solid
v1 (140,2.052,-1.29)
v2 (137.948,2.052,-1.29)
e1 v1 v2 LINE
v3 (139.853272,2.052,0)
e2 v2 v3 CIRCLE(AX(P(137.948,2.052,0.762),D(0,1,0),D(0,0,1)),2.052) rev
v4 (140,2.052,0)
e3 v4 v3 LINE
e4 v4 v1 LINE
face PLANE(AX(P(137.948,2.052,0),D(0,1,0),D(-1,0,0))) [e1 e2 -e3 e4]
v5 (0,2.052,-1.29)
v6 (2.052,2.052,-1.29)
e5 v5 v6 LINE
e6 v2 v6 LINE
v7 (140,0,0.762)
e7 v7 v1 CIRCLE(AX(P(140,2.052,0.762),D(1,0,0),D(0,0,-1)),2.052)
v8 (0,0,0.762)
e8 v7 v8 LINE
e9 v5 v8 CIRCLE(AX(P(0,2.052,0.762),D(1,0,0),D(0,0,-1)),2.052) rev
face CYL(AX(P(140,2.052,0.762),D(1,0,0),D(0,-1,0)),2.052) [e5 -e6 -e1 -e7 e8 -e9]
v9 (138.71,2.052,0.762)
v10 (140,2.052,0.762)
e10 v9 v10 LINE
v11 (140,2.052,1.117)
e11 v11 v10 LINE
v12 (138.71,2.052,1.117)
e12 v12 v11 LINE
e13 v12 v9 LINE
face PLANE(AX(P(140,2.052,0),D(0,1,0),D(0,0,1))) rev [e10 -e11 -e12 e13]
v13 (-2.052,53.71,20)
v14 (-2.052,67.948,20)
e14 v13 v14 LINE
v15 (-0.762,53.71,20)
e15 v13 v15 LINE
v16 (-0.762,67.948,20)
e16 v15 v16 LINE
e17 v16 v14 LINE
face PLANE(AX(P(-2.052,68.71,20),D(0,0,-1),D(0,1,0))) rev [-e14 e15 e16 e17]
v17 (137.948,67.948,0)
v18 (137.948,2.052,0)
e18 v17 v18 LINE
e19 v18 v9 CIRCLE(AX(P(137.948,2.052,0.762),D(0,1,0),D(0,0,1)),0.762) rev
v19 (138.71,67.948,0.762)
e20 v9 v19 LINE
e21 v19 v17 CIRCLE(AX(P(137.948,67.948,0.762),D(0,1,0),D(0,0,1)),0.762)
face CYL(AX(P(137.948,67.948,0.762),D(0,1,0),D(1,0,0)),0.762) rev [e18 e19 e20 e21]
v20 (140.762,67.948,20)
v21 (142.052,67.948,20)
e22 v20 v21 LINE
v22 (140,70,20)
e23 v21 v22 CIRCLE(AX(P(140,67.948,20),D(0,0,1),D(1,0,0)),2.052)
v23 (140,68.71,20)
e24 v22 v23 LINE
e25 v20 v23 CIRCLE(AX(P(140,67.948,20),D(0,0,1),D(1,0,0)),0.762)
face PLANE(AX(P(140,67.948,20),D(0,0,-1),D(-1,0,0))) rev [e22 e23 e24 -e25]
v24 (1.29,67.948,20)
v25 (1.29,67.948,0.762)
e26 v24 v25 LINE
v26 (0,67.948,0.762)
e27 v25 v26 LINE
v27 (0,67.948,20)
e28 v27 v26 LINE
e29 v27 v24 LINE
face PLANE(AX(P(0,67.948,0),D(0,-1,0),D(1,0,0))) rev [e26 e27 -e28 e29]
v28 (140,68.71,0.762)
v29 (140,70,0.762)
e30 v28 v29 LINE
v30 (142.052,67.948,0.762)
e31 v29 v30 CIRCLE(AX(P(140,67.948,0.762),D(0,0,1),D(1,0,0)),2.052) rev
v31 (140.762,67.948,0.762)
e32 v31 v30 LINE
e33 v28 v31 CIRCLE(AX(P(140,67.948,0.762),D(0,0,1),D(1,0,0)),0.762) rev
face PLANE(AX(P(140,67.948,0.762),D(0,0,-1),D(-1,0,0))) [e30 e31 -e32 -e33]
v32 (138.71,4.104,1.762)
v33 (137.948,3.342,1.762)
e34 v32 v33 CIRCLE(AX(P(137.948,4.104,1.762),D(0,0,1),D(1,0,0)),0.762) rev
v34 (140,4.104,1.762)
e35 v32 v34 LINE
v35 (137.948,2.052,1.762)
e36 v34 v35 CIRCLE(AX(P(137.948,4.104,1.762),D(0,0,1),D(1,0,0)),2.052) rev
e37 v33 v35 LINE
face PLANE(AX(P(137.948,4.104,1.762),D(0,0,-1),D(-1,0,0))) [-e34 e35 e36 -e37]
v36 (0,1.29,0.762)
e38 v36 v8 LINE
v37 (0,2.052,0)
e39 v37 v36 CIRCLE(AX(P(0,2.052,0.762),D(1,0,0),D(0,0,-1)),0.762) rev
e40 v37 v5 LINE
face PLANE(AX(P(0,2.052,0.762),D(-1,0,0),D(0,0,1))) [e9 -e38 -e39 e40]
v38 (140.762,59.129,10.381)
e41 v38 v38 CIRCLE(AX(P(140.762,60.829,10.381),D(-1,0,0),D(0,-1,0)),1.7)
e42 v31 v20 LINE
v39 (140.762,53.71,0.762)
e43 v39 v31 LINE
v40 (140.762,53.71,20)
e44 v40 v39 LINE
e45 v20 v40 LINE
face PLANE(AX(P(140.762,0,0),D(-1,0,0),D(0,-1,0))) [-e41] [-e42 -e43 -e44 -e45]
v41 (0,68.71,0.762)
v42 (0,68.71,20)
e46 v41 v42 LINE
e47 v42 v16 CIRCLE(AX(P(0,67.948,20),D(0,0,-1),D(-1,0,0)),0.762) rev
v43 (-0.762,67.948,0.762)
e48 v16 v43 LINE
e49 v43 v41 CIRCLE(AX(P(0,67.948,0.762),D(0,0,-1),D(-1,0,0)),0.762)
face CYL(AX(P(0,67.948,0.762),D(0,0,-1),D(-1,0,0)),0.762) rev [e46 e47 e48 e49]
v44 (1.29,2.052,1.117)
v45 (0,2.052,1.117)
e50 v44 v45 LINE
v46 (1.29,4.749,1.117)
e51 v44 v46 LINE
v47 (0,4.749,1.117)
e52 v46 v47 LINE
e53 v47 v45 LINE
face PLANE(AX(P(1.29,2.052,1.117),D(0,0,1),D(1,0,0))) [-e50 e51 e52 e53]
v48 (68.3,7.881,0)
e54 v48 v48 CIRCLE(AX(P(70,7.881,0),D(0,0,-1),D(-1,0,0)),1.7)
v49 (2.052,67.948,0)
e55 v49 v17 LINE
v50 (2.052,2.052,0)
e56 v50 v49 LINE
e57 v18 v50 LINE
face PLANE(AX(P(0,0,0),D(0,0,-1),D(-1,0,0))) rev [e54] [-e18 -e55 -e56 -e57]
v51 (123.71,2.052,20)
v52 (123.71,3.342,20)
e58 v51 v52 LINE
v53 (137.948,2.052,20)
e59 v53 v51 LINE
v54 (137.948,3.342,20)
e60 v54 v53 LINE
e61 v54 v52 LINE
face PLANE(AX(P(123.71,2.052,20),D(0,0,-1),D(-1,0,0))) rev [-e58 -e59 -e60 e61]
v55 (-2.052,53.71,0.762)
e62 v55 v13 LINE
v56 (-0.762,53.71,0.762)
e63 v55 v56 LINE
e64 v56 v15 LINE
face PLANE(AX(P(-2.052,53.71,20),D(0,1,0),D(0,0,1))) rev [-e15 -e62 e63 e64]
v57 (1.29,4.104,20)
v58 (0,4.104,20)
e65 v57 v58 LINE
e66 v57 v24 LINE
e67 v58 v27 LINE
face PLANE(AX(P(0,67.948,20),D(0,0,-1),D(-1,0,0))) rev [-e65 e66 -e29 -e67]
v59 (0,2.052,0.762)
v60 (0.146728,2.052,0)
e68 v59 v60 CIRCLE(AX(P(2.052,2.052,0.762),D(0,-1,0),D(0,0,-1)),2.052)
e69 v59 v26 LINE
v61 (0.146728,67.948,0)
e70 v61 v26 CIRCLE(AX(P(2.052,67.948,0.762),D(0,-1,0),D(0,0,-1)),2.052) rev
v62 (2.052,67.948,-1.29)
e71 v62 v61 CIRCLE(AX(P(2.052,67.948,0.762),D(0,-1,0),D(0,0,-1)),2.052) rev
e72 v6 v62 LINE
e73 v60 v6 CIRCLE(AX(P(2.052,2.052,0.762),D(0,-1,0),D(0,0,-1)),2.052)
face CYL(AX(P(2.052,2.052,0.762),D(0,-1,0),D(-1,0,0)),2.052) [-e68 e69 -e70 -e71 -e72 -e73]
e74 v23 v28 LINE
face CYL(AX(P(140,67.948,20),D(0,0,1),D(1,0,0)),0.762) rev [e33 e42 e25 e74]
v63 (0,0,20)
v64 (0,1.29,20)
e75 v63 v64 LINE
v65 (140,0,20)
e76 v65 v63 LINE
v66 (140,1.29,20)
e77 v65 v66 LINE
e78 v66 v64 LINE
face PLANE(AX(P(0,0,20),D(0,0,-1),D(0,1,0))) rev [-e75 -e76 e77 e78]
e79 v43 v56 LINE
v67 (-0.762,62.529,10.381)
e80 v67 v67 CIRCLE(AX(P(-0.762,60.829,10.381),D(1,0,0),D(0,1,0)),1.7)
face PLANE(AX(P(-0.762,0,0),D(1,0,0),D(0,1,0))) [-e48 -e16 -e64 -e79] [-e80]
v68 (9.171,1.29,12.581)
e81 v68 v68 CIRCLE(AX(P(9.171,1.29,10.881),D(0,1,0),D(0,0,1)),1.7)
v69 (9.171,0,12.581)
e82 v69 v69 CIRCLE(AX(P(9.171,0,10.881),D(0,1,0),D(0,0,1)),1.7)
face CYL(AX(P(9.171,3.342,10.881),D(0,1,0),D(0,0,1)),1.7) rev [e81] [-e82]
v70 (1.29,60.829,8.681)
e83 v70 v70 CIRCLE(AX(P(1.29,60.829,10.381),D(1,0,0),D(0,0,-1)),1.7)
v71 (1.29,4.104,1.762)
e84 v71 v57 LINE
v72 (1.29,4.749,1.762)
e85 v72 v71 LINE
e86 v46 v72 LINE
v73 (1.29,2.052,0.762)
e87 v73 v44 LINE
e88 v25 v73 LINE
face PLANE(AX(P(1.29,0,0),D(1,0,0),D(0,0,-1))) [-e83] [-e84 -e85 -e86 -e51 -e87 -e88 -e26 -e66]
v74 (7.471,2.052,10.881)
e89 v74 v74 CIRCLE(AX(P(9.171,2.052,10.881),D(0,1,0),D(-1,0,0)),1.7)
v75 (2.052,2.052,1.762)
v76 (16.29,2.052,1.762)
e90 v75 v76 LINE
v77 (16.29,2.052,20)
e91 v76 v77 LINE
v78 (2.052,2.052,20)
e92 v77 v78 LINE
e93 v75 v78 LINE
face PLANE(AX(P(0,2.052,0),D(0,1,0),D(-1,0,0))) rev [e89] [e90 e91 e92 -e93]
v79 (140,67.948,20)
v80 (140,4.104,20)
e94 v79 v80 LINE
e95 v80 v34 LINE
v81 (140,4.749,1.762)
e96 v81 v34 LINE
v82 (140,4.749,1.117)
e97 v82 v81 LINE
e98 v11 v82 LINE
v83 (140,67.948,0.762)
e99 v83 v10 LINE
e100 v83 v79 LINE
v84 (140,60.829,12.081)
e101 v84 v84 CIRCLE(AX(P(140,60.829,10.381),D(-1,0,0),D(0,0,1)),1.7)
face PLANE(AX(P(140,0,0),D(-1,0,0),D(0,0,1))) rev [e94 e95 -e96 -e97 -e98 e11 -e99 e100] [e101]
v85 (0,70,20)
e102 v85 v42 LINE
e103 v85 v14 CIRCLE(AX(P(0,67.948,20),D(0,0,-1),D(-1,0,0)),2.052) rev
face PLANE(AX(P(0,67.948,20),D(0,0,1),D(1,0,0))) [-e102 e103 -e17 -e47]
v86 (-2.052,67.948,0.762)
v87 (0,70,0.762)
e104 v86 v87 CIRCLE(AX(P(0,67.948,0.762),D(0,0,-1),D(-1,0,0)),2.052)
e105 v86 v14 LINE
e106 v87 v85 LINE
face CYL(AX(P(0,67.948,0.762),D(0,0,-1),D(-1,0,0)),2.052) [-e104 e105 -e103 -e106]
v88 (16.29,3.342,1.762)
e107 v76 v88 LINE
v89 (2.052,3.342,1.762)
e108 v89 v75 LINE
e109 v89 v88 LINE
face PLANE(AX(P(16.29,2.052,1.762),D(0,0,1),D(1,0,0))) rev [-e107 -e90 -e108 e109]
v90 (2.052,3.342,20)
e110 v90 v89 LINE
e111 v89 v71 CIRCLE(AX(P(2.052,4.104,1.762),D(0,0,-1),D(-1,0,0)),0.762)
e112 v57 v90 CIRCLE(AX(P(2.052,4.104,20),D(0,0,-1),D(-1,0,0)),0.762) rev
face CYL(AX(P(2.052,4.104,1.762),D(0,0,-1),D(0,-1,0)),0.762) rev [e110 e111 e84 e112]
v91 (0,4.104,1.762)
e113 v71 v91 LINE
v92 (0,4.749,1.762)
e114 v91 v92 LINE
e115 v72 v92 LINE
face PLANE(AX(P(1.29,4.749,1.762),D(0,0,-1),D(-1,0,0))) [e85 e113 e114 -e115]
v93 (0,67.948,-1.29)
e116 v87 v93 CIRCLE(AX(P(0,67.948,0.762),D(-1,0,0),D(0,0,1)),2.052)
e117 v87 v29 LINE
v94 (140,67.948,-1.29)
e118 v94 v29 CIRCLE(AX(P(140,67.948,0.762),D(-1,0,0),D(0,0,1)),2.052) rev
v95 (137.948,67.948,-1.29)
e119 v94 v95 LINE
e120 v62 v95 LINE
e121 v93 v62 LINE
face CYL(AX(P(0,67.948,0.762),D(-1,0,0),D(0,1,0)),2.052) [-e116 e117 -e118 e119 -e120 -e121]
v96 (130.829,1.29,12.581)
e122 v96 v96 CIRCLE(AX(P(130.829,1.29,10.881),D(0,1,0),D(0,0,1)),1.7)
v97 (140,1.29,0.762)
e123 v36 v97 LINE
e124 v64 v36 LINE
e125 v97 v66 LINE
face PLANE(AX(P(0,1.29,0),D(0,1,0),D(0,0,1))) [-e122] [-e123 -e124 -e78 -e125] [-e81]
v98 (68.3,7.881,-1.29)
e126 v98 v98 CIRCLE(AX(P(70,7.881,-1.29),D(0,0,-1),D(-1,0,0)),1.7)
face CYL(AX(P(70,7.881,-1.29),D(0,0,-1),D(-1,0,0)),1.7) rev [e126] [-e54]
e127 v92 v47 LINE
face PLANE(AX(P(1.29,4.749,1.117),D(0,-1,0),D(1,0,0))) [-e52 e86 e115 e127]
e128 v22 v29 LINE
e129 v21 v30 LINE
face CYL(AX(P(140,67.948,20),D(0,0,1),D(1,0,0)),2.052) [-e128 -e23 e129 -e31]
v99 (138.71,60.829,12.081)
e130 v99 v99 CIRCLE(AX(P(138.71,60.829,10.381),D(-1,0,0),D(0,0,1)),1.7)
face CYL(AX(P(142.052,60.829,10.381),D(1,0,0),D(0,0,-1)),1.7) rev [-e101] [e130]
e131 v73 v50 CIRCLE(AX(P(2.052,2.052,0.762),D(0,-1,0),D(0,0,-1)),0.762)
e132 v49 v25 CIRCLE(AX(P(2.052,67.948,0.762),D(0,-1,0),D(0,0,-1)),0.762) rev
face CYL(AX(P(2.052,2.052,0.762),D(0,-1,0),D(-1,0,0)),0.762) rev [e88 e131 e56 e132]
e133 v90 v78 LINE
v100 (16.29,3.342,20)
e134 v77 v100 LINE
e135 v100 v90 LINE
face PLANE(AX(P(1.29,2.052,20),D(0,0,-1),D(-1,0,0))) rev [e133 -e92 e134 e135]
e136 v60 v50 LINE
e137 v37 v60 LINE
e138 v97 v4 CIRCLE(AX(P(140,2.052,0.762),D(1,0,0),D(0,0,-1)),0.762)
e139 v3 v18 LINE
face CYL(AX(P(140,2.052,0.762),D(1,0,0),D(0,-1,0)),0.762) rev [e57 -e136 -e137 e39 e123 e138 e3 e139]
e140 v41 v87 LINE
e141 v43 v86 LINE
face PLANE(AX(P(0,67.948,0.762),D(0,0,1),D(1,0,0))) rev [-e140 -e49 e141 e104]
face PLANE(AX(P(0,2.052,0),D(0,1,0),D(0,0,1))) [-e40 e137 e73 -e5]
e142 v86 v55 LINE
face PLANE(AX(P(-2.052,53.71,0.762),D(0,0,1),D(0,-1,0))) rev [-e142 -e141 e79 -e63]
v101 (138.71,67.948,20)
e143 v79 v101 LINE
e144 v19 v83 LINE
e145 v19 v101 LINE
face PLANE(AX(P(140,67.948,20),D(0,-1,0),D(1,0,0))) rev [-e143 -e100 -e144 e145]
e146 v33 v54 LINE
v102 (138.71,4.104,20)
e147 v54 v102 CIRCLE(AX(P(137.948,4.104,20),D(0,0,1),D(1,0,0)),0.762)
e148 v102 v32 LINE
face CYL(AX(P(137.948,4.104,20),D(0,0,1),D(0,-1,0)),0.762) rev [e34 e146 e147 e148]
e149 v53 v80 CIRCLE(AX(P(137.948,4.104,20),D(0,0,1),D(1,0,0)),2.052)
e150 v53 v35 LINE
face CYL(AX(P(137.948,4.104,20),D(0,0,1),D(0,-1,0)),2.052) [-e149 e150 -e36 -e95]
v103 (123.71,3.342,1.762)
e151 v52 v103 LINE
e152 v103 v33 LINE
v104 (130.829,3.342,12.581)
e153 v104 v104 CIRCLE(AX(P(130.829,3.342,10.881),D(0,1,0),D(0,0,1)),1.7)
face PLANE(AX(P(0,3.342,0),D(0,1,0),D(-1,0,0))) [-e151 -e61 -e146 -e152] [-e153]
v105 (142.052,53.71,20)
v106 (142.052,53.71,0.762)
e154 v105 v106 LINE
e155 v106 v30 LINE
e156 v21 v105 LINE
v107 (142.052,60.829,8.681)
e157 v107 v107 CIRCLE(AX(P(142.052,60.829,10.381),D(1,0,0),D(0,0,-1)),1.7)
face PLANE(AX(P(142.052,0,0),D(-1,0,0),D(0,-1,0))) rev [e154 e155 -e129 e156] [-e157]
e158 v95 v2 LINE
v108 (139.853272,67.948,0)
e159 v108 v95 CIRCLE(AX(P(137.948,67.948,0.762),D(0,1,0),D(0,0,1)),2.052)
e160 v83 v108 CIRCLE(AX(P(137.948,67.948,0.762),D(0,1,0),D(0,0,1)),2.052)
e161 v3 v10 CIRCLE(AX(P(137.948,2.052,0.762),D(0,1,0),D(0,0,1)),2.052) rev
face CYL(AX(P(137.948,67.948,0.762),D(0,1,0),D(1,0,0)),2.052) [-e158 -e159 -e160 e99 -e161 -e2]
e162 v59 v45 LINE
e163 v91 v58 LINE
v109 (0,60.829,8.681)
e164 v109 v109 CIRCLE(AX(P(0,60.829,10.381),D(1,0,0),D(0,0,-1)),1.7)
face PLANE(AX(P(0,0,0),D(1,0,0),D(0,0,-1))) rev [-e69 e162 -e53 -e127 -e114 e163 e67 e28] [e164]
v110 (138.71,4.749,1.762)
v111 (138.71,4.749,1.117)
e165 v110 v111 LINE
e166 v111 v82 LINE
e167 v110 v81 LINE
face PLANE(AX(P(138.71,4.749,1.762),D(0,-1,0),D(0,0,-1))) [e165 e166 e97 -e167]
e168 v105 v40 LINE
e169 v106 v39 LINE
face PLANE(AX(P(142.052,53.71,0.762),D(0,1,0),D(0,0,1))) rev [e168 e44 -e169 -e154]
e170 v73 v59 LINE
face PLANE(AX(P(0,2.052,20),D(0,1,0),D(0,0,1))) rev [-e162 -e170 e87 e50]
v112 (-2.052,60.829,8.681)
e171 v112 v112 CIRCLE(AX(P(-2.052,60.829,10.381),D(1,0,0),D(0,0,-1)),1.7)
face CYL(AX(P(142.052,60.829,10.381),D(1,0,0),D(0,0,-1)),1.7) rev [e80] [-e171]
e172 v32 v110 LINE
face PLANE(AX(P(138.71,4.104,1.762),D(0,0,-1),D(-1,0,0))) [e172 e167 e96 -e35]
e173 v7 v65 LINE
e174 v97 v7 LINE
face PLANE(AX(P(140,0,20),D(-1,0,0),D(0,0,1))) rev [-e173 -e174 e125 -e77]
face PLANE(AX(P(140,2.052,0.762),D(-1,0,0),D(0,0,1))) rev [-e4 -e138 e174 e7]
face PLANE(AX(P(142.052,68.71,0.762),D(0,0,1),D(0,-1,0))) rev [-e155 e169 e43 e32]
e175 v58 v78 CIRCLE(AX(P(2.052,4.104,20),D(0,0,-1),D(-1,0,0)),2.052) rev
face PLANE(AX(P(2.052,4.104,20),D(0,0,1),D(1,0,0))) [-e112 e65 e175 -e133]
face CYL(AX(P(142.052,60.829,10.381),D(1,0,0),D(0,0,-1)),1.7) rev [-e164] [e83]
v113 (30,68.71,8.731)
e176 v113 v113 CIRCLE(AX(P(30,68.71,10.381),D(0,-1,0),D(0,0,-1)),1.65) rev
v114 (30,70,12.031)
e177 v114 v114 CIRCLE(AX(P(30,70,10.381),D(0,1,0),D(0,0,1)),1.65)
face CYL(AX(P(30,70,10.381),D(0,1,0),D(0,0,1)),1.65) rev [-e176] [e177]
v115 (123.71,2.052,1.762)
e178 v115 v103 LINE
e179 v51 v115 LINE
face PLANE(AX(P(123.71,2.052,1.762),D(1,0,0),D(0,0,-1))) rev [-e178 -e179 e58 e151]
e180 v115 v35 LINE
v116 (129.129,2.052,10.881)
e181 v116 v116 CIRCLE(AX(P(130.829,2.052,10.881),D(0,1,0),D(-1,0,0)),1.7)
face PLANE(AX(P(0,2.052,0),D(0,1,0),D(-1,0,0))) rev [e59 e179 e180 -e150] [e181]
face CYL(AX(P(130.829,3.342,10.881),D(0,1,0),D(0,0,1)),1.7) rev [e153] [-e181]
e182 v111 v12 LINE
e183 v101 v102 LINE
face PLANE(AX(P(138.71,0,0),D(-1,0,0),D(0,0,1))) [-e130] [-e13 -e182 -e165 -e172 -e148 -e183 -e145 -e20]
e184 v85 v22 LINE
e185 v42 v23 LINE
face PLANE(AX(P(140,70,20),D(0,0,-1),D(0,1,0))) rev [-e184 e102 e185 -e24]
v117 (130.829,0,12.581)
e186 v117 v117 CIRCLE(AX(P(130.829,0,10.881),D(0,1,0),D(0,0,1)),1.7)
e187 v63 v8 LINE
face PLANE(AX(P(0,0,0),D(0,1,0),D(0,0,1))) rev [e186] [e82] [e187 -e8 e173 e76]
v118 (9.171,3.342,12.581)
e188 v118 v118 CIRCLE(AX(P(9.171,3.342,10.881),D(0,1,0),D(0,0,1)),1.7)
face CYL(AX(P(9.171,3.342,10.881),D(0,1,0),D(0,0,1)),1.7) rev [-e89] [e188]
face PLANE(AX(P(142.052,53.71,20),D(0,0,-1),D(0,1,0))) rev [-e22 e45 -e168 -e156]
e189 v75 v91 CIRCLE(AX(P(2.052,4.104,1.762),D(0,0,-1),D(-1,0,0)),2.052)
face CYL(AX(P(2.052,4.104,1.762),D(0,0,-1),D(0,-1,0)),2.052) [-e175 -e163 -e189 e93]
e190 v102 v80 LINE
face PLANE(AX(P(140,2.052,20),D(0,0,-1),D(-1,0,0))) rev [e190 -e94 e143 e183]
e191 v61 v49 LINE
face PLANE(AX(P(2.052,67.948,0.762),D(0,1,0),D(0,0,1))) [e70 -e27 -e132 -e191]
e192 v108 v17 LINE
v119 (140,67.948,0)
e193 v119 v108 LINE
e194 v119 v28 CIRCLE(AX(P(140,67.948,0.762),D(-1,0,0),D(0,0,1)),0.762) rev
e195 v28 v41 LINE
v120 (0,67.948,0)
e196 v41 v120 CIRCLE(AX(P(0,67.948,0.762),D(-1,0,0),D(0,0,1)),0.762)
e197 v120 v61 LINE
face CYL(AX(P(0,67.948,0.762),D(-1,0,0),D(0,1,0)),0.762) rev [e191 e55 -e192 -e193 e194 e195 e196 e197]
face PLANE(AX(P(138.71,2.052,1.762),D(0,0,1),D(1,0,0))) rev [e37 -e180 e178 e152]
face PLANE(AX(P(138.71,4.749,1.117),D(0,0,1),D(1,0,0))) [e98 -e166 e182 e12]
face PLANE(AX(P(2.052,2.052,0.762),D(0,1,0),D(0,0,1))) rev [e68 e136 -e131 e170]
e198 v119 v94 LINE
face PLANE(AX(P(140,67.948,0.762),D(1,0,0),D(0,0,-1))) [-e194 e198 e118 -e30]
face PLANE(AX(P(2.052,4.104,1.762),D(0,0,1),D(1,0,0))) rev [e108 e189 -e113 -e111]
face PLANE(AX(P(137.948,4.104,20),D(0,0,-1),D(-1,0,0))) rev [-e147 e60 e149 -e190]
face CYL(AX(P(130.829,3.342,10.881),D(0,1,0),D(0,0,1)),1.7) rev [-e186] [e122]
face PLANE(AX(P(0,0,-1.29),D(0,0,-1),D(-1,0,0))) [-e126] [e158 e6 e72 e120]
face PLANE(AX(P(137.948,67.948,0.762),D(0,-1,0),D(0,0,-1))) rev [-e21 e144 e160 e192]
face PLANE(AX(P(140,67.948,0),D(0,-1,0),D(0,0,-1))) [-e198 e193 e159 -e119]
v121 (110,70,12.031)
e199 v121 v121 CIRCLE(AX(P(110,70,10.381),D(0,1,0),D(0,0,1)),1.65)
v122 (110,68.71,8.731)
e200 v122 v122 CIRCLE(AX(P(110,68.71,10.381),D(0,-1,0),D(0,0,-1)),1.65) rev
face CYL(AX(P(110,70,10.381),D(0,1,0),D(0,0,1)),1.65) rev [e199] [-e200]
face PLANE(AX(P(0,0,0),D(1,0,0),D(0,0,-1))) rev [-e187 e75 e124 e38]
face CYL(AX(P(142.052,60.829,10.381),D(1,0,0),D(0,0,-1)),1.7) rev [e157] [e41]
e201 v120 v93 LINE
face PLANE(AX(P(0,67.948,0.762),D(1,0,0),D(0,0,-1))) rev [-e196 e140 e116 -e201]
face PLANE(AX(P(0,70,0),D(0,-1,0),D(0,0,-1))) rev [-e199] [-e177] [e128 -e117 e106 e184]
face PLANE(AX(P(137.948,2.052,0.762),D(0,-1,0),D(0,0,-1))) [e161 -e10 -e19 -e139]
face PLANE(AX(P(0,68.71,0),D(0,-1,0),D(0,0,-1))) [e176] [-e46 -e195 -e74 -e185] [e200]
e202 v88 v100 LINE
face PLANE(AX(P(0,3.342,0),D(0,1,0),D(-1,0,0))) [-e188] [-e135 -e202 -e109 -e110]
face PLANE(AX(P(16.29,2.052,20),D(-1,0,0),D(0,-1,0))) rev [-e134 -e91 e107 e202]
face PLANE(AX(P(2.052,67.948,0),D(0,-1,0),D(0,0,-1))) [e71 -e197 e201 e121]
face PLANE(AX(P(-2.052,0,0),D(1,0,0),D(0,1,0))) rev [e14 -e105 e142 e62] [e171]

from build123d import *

# Parameters (mm, degrees)
SKETCH1_W                        = 140
SKETCH1_H                        = 70
BASE_FLANGE1_DEPTH               = 1.29
EDGE_FLANGE1_STRIP_W             = 6.684
EDGE_FLANGE1_STRIP_H             = 1.29
EDGE_FLANGE1_STRIP_CUT_DEPTH     = 140
EDGE_FLANGE1_DEPTH               = 140
EDGE_FLANGE2_STRIP_W             = 6.684
EDGE_FLANGE2_STRIP_H             = 1.29
EDGE_FLANGE2_STRIP_CUT_DEPTH     = 140
EDGE_FLANGE2_DEPTH               = 140
EDGE_FLANGE3_STRIP_W             = 6.684
EDGE_FLANGE3_STRIP_H             = 1.29
EDGE_FLANGE3_STRIP_CUT_DEPTH     = 65.896
EDGE_FLANGE3_DEPTH               = 65.896
EDGE_FLANGE4_STRIP_W             = 6.684
EDGE_FLANGE4_STRIP_H             = 1.29
EDGE_FLANGE4_STRIP_CUT_DEPTH     = 65.896
EDGE_FLANGE4_DEPTH               = 65.896
EDGE_FLANGE6_START               = 1.117
EDGE_FLANGE6_DEPTH               = 18.883
EDGE_FLANGE6_2_DEPTH             = 0.645
EDGE_FLANGE6_START_2             = 1.762
EDGE_FLANGE6_3_DEPTH             = 18.238
EDGE_FLANGE8_START               = 1.117
EDGE_FLANGE8_DEPTH               = 18.883
EDGE_FLANGE8_2_DEPTH             = 0.645
EDGE_FLANGE8_START_2             = 1.762
EDGE_FLANGE8_3_DEPTH             = 18.238
M3_CLEARANCE_HOLE1_D             = 3.4
EDGE_FLANGE9_DEPTH               = 19.238
EDGE_FLANGE10_DEPTH              = 19.238
TAP_DRILL_FOR_M4X0_7_TAP1_REACH  = 161.621
TAP_DRILL_FOR_M4X0_7_TAP1_BORE_R = 1.65
M3_CLEARANCE_HOLE3_D             = 3.4
M3_CLEARANCE_HOLE3_DEPTH         = 3.342
M3_CLEARANCE_HOLE4_D             = 3.4


# Read off the part's stored shape, not the designer's step: Edge-Flange6, Edge-Flange8
# Sheet-metal steps are written as plain solids
with BuildPart() as part:
    # Sketch1 → Base-Flange1 (new body)
    with BuildSketch(Plane.XY):
        with Locations((70, 35)):
            Rectangle(SKETCH1_W, SKETCH1_H)
    extrude(amount=-BASE_FLANGE1_DEPTH)

    # Edge-Flange1 strip (across the edge) → Edge-Flange1 strip cut (cut)
    with BuildSketch(Plane(origin=(140, 70, 0), x_dir=(0, -1, 0), z_dir=(-1, 0, 0))):
        with Locations((-1.29, -0.645)):
            Rectangle(EDGE_FLANGE1_STRIP_W, EDGE_FLANGE1_STRIP_H)
    extrude(amount=EDGE_FLANGE1_STRIP_CUT_DEPTH, mode=Mode.SUBTRACT)

    # Edge-Flange1 section (across the edge) → Edge-Flange1 (add)
    with BuildSketch(Plane(origin=(140, 70, 0), x_dir=(0, -1, 0), z_dir=(-1, 0, 0))):
        with BuildLine():
            Line((0, 0.762), (0, 20))
            Line((0, 20), (1.29, 20))
            Line((1.29, 20), (1.29, 0.762))
            ThreePointArc((1.29, 0.762), (1.513184633, 0.223184633), (2.052, 0))
            Line((2.052, 0), (2.052, -1.29))
            ThreePointArc((2.052, -1.29), (0.601016885, -0.688983115), (0, 0.762))
        make_face()
    extrude(amount=EDGE_FLANGE1_DEPTH)

    # Edge-Flange2 strip (across the edge) → Edge-Flange2 strip cut (cut)
    with BuildSketch(Plane.YZ):
        with Locations((-1.29, -0.645)):
            Rectangle(EDGE_FLANGE2_STRIP_W, EDGE_FLANGE2_STRIP_H)
    extrude(amount=EDGE_FLANGE2_STRIP_CUT_DEPTH, mode=Mode.SUBTRACT)

    # Edge-Flange2 section (across the edge) → Edge-Flange2 (add)
    with BuildSketch(Plane.YZ):
        with BuildLine():
            Line((0, 0.762), (0, 20))
            Line((0, 20), (1.29, 20))
            Line((1.29, 20), (1.29, 0.762))
            ThreePointArc((1.29, 0.762), (1.513184633, 0.223184633), (2.052, 0))
            Line((2.052, 0), (2.052, -1.29))
            ThreePointArc((2.052, -1.29), (0.601016885, -0.688983115), (0, 0.762))
        make_face()
    extrude(amount=EDGE_FLANGE2_DEPTH)

    # Edge-Flange3 strip (across the edge) → Edge-Flange3 strip cut (cut)
    with BuildSketch(Plane.XZ.offset(-67.948)):
        with Locations((-1.29, -0.645)):
            Rectangle(EDGE_FLANGE3_STRIP_W, EDGE_FLANGE3_STRIP_H)
    extrude(amount=EDGE_FLANGE3_STRIP_CUT_DEPTH, mode=Mode.SUBTRACT)

    # Edge-Flange3 section (across the edge) → Edge-Flange3 (add)
    with BuildSketch(Plane.XZ.offset(-67.948)):
        with BuildLine():
            Line((0, 0.762), (0, 20))
            Line((0, 20), (1.29, 20))
            Line((1.29, 20), (1.29, 0.762))
            ThreePointArc((1.29, 0.762), (1.513184633, 0.223184633), (2.052, 0))
            Line((2.052, 0), (2.052, -1.29))
            ThreePointArc((2.052, -1.29), (0.601016885, -0.688983115), (0, 0.762))
        make_face()
    extrude(amount=EDGE_FLANGE3_DEPTH)

    # Edge-Flange4 strip (across the edge) → Edge-Flange4 strip cut (cut)
    with BuildSketch(Plane(origin=(140, 2.052, 0), x_dir=(-1, 0, 0), z_dir=(0, 1, 0))):
        with Locations((-1.29, -0.645)):
            Rectangle(EDGE_FLANGE4_STRIP_W, EDGE_FLANGE4_STRIP_H)
    extrude(amount=EDGE_FLANGE4_STRIP_CUT_DEPTH, mode=Mode.SUBTRACT)

    # Edge-Flange4 section (across the edge) → Edge-Flange4 (add)
    with BuildSketch(Plane(origin=(140, 2.052, 0), x_dir=(-1, 0, 0), z_dir=(0, 1, 0))):
        with BuildLine():
            Line((0, 0.762), (0, 20))
            Line((0, 20), (1.29, 20))
            Line((1.29, 20), (1.29, 0.762))
            ThreePointArc((1.29, 0.762), (1.513184633, 0.223184633), (2.052, 0))
            Line((2.052, 0), (2.052, -1.29))
            ThreePointArc((2.052, -1.29), (0.601016885, -0.688983115), (0, 0.762))
        make_face()
    extrude(amount=EDGE_FLANGE4_DEPTH)

    # Edge-Flange6 outline → Edge-Flange6 (cut)
    with BuildSketch(Plane.XY.offset(EDGE_FLANGE6_START)):
        with BuildLine():
            Line((1.29, 2.052), (1.29, 2.198728366))
            ThreePointArc((1.29, 2.198728366), (0.352834322, 2.953547915), (0, 4.104))
            Line((0, 4.104), (0, 2.052))
            Line((0, 2.052), (1.29, 2.052))
        make_face()
    extrude(amount=EDGE_FLANGE6_DEPTH, mode=Mode.SUBTRACT)

    # Edge-Flange6 2 outline → Edge-Flange6 2 (cut)
    with BuildSketch(Plane.XY.offset(EDGE_FLANGE6_START)):
        with BuildLine():
            ThreePointArc((0, 4.104), (0.352834322, 2.953547915), (1.29, 2.198728366))
            Line((1.29, 2.198728366), (1.29, 4.749))
            Line((1.29, 4.749), (0, 4.749))
            Line((0, 4.749), (0, 4.104))
        make_face()
    extrude(amount=EDGE_FLANGE6_2_DEPTH, mode=Mode.SUBTRACT)

    # Edge-Flange6 3 outline → Edge-Flange6 3 (add)
    with BuildSketch(Plane.XY.offset(EDGE_FLANGE6_START_2)):
        with BuildLine():
            Line((2.052, 2.052), (16.29, 2.052))
            Line((16.29, 2.052), (16.29, 3.342))
            Line((16.29, 3.342), (2.052, 3.342))
            ThreePointArc((2.052, 3.342), (1.513184633, 3.565184633), (1.29, 4.104))
            Line((1.29, 4.104), (1.29, 2.198728366))
            ThreePointArc((1.29, 2.198728366), (1.664000898, 2.089015956), (2.052, 2.052))
        make_face()
    extrude(amount=EDGE_FLANGE6_3_DEPTH)

    # Edge-Flange8 outline → Edge-Flange8 (cut)
    with BuildSketch(Plane.XY.offset(EDGE_FLANGE8_START)):
        with BuildLine():
            ThreePointArc((140, 4.104), (139.647165678, 2.953547915), (138.71, 2.198728366))
            Line((138.71, 2.198728366), (138.71, 2.052))
            Line((138.71, 2.052), (140, 2.052))
            Line((140, 2.052), (140, 4.104))
        make_face()
    extrude(amount=EDGE_FLANGE8_DEPTH, mode=Mode.SUBTRACT)

    # Edge-Flange8 2 outline → Edge-Flange8 2 (cut)
    with BuildSketch(Plane.XY.offset(EDGE_FLANGE8_START)):
        with BuildLine():
            Line((138.71, 4.749), (138.71, 2.198728366))
            ThreePointArc((138.71, 2.198728366), (139.647165678, 2.953547915), (140, 4.104))
            Line((140, 4.104), (140, 4.749))
            Line((140, 4.749), (138.71, 4.749))
        make_face()
    extrude(amount=EDGE_FLANGE8_2_DEPTH, mode=Mode.SUBTRACT)

    # Edge-Flange8 3 outline → Edge-Flange8 3 (add)
    with BuildSketch(Plane.XY.offset(EDGE_FLANGE8_START_2)):
        with BuildLine():
            Line((123.71, 2.052), (137.948, 2.052))
            ThreePointArc((137.948, 2.052), (138.335999102, 2.089015956), (138.71, 2.198728366))
            Line((138.71, 2.198728366), (138.71, 4.104))
            ThreePointArc((138.71, 4.104), (138.486815367, 3.565184633), (137.948, 3.342))
            Line((137.948, 3.342), (123.71, 3.342))
            Line((123.71, 3.342), (123.71, 2.052))
        make_face()
    extrude(amount=EDGE_FLANGE8_3_DEPTH)

    # M3 Clearance Hole1 (through all)
    with Locations(Plane(origin=(34.266060613, 19.783275694, -1.29), x_dir=(-1, 0, 0), z_dir=(0, 0, -1))):
        with Locations((-35.733939387, -11.902275694)):
            Hole(M3_CLEARANCE_HOLE1_D / 2)

    # Edge-Flange9 section (across the edge) → Edge-Flange9 (add)
    with BuildSketch(Plane(origin=(140.762, 68.71, 0.762), x_dir=(-1, 0, 0), z_dir=(0, 0, 1))):
        with BuildLine():
            Line((-1.29, 0.762), (-1.29, 15))
            Line((-1.29, 15), (0, 15))
            Line((0, 15), (0, 0.762))
            ThreePointArc((0, 0.762), (0.223184633, 0.223184633), (0.762, 0))
            Line((0.762, 0), (0.762, -1.29))
            ThreePointArc((0.762, -1.29), (-0.688983115, -0.688983115), (-1.29, 0.762))
        make_face()
    extrude(amount=EDGE_FLANGE9_DEPTH)

    # Edge-Flange10 section (across the edge) → Edge-Flange10 (add)
    with BuildSketch(Plane(origin=(-0.762, 68.71, 20), x_dir=(1, 0, 0), z_dir=(0, 0, -1))):
        with BuildLine():
            Line((-1.29, 0.762), (-1.29, 15))
            Line((-1.29, 15), (0, 15))
            Line((0, 15), (0, 0.762))
            ThreePointArc((0, 0.762), (0.223184633, 0.223184633), (0.762, 0))
            Line((0.762, 0), (0.762, -1.29))
            ThreePointArc((0.762, -1.29), (-0.688983115, -0.688983115), (-1.29, 0.762))
        make_face()
    extrude(amount=EDGE_FLANGE10_DEPTH)

    # Tap Drill for M4x0.7 Tap1 bore → Tap Drill for M4x0.7 Tap1 (cut, up to next)
    with BuildSketch(Plane(origin=(0, 70, 0), x_dir=(1, 0, 0), z_dir=(0, 1, 0)), mode=Mode.PRIVATE) as tap_drill_for_m4x0_7_tap1_sk1:
        with Locations((30, -10.381)):
            Circle(TAP_DRILL_FOR_M4X0_7_TAP1_BORE_R)
    tap_drill_for_m4x0_7_tap1_tool1 = extrude(tap_drill_for_m4x0_7_tap1_sk1.sketch, amount=-TAP_DRILL_FOR_M4X0_7_TAP1_REACH, mode=Mode.PRIVATE) & part.part
    # Tap Drill for M4x0.7 Tap1 bore → Tap Drill for M4x0.7 Tap1 (cut, up to next)
    with BuildSketch(Plane(origin=(0, 70, 0), x_dir=(1, 0, 0), z_dir=(0, 1, 0)), mode=Mode.PRIVATE) as tap_drill_for_m4x0_7_tap1_sk2:
        with Locations((110, -10.381)):
            Circle(TAP_DRILL_FOR_M4X0_7_TAP1_BORE_R)
    tap_drill_for_m4x0_7_tap1_tool2 = extrude(tap_drill_for_m4x0_7_tap1_sk2.sketch, amount=-TAP_DRILL_FOR_M4X0_7_TAP1_REACH, mode=Mode.PRIVATE) & part.part
    add(tap_drill_for_m4x0_7_tap1_tool1.solids().sort_by_distance((30, 70, 10.381))[0], mode=Mode.SUBTRACT)
    add(tap_drill_for_m4x0_7_tap1_tool2.solids().sort_by_distance((110, 70, 10.381))[0], mode=Mode.SUBTRACT)

    # M3 Clearance Hole3
    with Locations(Plane(origin=(0, 3.342, 0), x_dir=(1, 0, 0), z_dir=(0, 1, 0))):
        with Locations((9.171, -10.881), (130.829, -10.881)):
            Hole(M3_CLEARANCE_HOLE3_D / 2, depth=M3_CLEARANCE_HOLE3_DEPTH)

    # M3 Clearance Hole4 (through all)
    with Locations(Plane(origin=(142.052, 0, 0), x_dir=(0, 0, -1), z_dir=(1, 0, 0))):
        with Locations((-10.381, 60.829)):
            Hole(M3_CLEARANCE_HOLE4_D / 2)


solid = part.part
